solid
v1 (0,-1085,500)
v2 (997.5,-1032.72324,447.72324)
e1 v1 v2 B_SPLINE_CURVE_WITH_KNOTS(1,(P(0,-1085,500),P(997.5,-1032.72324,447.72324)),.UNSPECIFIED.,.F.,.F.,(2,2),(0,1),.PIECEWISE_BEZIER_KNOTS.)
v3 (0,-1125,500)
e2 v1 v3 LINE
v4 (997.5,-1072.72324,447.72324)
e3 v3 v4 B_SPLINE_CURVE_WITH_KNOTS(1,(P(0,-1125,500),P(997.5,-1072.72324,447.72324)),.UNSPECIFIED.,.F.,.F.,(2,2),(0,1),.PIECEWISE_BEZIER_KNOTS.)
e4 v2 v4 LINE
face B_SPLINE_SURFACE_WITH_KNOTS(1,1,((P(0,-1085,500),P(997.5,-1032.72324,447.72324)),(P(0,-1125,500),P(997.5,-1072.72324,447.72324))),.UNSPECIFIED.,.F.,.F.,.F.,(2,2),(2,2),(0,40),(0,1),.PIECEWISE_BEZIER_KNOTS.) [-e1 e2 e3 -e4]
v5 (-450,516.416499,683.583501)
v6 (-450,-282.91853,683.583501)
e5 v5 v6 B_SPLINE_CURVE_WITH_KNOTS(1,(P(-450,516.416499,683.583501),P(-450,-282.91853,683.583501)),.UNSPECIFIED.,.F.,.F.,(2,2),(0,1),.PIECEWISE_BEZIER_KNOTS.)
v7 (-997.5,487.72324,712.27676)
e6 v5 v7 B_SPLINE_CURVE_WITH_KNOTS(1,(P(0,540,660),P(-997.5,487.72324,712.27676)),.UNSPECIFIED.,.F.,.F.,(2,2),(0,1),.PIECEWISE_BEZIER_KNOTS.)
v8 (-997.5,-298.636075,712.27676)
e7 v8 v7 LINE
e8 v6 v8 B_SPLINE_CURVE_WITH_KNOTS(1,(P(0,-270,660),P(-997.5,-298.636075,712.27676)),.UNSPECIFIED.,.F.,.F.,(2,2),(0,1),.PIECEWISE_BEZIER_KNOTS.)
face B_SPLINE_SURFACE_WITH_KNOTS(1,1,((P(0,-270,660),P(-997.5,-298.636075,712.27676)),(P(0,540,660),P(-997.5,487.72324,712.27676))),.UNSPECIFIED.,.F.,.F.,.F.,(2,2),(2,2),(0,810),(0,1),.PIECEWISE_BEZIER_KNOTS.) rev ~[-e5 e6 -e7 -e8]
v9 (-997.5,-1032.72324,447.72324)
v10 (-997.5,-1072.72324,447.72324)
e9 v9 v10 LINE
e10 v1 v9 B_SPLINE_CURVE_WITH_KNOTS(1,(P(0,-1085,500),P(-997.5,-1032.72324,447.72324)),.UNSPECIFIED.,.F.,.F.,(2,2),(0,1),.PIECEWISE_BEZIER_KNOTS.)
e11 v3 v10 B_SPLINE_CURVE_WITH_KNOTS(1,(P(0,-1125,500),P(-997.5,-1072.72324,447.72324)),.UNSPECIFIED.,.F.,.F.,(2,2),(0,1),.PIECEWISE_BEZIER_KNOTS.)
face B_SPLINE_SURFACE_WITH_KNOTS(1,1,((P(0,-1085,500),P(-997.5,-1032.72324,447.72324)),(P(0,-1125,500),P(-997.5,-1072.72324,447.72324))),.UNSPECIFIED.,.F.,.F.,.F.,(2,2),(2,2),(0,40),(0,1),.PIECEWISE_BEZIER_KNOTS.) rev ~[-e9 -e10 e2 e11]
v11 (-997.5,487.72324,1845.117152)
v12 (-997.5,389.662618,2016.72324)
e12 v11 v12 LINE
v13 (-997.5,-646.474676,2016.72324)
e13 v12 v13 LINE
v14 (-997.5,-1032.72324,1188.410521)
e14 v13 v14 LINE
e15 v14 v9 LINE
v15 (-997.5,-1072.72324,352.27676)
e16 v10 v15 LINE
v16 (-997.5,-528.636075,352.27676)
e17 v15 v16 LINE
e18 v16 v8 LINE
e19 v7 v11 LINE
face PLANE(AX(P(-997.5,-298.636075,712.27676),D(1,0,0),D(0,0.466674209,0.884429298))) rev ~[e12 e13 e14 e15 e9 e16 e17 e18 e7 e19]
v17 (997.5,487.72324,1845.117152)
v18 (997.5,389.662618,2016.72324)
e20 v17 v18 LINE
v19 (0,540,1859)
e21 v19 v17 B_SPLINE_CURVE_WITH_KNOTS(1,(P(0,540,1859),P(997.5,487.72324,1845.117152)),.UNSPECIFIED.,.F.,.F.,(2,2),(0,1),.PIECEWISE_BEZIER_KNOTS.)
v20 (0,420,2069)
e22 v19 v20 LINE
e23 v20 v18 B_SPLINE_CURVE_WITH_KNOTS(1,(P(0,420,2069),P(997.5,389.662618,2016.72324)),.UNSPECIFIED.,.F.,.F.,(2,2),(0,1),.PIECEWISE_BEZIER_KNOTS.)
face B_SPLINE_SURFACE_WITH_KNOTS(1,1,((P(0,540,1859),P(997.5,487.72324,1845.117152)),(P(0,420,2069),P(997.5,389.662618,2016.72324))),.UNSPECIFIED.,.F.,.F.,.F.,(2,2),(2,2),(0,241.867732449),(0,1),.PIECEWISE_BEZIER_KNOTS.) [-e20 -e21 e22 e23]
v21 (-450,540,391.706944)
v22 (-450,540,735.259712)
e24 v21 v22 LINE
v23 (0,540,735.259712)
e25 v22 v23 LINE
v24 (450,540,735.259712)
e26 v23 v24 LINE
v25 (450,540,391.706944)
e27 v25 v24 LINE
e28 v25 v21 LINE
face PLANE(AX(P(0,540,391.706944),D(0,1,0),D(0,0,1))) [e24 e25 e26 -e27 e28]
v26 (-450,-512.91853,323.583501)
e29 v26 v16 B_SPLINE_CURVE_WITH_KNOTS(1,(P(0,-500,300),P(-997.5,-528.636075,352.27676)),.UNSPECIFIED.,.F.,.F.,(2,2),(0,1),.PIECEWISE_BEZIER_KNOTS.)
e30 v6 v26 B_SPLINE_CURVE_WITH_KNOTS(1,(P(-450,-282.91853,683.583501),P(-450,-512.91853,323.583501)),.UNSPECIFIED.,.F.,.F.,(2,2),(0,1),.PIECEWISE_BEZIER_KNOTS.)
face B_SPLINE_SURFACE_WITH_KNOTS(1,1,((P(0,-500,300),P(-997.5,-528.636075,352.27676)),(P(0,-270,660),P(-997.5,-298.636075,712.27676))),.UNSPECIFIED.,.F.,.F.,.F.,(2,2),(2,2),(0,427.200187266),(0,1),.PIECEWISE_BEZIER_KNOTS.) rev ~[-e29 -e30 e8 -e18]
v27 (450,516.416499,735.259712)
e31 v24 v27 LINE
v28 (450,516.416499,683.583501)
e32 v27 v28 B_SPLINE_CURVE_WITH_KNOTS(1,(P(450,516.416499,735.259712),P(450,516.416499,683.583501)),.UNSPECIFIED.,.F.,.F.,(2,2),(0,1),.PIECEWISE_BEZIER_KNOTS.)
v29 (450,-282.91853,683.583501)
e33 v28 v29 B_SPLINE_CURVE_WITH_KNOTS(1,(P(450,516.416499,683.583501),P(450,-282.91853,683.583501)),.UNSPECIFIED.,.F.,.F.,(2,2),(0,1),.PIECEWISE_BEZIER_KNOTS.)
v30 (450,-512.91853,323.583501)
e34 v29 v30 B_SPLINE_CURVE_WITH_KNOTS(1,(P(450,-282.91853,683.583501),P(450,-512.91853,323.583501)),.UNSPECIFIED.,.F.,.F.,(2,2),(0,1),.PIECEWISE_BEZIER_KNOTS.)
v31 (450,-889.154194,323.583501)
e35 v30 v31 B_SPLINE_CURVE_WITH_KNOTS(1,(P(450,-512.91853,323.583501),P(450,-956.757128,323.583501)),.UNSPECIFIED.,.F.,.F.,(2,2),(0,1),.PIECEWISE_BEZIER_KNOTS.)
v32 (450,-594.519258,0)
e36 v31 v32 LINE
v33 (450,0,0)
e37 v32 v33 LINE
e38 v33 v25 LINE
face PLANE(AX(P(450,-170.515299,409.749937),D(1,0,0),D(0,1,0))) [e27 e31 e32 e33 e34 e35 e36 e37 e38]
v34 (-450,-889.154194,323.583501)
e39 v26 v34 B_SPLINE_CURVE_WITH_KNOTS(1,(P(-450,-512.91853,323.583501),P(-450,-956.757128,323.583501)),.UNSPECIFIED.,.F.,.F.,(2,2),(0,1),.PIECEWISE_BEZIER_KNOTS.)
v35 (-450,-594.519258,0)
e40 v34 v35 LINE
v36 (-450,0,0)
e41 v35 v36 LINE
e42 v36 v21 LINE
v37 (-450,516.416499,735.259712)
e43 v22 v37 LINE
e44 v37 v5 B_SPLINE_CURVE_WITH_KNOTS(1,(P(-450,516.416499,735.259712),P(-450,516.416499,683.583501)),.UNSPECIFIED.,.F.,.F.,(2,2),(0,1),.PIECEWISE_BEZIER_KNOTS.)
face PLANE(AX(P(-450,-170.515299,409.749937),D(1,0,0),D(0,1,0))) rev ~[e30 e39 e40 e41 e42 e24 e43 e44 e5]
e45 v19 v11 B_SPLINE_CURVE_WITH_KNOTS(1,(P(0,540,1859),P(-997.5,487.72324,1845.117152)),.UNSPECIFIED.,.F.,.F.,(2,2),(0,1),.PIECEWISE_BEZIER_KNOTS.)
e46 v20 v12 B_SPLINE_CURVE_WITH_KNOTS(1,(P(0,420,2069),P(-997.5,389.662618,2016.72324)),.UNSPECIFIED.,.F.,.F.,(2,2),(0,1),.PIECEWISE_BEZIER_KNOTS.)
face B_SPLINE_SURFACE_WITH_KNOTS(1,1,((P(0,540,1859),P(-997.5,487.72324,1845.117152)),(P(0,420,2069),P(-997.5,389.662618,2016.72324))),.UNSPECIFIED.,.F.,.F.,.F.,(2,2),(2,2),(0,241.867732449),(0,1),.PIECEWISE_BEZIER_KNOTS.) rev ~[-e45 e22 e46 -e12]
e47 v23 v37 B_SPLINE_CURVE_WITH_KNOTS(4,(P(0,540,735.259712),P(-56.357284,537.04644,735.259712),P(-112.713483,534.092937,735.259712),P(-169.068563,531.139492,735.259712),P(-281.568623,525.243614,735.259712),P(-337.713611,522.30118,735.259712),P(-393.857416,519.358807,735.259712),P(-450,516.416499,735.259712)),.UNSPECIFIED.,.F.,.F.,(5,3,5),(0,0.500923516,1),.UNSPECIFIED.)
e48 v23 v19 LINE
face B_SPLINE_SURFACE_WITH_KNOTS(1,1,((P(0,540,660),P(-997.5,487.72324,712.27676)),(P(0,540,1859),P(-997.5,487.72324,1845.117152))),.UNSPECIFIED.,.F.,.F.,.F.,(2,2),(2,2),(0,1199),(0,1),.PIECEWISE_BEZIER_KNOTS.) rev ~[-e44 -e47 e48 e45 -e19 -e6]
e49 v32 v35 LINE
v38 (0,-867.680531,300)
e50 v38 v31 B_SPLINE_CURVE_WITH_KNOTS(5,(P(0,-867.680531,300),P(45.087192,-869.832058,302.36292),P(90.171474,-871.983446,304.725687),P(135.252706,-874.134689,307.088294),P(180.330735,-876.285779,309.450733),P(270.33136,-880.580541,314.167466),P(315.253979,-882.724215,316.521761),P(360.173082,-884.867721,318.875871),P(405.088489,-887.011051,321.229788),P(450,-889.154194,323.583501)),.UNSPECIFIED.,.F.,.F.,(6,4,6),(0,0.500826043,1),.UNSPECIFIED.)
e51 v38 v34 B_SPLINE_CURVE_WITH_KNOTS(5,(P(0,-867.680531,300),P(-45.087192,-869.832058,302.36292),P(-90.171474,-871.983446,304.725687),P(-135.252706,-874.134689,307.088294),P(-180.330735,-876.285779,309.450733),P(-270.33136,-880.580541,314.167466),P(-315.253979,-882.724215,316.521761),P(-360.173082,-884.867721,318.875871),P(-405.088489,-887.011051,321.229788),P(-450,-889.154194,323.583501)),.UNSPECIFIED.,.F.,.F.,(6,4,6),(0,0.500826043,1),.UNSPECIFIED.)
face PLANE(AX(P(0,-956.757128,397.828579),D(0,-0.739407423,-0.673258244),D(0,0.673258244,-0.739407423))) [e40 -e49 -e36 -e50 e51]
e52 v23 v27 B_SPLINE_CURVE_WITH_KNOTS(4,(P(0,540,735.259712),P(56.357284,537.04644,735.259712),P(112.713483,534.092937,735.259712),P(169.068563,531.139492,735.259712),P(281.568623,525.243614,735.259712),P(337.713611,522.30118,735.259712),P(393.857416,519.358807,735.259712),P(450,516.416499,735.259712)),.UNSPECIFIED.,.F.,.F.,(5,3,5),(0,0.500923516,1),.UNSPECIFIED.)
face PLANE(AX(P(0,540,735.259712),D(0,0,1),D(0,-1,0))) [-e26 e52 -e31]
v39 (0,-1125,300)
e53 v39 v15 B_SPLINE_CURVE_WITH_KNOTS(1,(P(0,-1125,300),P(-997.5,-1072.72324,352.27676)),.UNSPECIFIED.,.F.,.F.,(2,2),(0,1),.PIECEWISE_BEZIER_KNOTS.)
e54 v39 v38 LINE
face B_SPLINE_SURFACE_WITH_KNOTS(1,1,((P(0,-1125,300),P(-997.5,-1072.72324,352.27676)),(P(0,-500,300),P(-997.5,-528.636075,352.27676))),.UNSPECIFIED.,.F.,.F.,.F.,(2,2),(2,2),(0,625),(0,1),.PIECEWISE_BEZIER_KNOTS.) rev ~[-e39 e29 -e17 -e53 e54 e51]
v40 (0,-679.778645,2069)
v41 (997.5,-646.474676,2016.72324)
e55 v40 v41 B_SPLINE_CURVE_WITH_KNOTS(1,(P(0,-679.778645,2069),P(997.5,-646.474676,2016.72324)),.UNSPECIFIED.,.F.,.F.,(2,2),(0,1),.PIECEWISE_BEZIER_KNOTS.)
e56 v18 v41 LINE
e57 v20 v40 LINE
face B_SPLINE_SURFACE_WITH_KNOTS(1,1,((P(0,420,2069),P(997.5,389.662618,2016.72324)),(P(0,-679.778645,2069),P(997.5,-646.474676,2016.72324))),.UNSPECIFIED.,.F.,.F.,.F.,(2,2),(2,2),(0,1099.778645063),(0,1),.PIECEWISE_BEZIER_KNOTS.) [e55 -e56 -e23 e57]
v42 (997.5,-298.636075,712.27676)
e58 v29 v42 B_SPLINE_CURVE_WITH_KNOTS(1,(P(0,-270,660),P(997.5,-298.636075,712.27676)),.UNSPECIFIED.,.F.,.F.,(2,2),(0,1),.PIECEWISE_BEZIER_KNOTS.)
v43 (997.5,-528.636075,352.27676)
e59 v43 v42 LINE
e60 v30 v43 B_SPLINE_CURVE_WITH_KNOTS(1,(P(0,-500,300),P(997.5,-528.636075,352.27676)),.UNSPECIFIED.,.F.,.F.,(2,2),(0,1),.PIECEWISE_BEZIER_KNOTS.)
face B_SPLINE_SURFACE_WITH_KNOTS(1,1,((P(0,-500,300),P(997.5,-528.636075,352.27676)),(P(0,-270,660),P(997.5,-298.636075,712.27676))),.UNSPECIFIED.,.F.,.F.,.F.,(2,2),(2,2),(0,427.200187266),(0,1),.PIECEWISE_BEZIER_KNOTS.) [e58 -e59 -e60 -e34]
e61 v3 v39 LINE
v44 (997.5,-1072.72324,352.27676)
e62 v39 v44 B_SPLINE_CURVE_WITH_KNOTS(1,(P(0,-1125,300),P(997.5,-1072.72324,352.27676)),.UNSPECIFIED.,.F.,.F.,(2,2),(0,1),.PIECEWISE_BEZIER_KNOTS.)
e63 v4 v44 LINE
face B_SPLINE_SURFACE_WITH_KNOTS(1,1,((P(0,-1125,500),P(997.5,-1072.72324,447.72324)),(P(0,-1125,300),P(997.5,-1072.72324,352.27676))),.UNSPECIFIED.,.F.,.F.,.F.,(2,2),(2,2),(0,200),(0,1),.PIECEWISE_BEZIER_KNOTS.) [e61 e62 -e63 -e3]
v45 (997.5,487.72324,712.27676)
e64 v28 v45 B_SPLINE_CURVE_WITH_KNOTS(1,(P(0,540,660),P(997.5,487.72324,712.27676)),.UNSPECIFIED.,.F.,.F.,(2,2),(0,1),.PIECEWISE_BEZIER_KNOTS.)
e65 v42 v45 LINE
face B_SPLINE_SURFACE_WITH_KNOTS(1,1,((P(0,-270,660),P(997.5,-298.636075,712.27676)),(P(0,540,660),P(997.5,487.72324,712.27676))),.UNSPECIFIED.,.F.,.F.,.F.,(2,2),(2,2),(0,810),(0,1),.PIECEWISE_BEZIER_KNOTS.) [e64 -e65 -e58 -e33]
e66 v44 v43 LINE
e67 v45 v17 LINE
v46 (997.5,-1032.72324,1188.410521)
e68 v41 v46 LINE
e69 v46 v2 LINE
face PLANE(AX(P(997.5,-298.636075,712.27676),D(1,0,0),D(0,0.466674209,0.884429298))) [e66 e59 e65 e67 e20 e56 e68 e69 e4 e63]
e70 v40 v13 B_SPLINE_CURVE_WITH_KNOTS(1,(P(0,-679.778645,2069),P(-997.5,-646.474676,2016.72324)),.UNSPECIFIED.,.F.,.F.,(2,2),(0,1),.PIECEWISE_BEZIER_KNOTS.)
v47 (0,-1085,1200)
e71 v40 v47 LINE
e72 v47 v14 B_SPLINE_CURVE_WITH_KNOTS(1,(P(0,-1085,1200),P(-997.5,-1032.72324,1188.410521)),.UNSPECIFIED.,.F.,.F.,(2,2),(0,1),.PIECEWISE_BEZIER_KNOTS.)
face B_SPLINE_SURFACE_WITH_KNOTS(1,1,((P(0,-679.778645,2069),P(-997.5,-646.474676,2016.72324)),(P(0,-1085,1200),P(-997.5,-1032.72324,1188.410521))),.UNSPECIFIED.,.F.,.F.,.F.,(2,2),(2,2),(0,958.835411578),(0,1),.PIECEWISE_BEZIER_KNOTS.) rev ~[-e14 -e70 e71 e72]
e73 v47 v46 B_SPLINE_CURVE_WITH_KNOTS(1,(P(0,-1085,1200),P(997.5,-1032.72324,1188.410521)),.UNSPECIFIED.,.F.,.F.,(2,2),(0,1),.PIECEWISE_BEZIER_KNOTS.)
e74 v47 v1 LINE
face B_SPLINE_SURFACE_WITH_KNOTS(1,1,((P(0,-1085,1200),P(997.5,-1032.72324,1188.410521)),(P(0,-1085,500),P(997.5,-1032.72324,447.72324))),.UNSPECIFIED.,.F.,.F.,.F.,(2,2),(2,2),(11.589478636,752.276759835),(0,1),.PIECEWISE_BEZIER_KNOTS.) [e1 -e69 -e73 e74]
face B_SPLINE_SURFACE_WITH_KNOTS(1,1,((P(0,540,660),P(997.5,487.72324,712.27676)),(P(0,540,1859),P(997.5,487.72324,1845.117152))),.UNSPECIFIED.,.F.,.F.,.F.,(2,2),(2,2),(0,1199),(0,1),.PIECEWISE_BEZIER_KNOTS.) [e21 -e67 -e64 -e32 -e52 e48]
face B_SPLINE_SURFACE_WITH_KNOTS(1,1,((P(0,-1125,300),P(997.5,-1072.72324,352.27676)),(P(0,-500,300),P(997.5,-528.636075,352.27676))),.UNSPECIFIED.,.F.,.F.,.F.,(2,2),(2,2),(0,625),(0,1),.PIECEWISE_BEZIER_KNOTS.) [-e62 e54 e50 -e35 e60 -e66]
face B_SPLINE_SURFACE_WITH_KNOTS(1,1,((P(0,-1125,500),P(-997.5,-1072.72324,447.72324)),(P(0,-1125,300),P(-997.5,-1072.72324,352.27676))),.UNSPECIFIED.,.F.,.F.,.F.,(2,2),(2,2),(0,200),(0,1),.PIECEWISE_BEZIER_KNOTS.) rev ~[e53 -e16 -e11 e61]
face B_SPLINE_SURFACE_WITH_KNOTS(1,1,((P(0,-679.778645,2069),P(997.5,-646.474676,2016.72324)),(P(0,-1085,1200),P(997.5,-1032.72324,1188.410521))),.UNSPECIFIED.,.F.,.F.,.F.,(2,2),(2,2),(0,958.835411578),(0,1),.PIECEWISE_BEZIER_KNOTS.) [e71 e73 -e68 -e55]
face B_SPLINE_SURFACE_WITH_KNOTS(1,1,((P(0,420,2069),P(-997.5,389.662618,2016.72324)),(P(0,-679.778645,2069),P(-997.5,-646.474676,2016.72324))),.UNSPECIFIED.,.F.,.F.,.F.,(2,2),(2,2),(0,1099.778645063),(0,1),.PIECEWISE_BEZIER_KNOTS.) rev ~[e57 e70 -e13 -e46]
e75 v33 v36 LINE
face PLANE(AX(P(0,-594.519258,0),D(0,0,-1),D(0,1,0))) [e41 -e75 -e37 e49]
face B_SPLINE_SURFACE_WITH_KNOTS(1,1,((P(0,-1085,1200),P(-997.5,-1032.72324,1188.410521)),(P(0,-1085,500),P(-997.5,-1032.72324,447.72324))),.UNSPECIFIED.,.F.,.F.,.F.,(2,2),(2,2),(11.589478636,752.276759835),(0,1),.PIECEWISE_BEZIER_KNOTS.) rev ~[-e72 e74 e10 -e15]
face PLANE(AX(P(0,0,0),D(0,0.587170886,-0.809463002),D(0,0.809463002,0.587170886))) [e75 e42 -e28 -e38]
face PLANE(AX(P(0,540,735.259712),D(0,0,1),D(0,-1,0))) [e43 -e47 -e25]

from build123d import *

# Parameters (mm, degrees)
F1_DEPTH = 997.5
F1_TAPER = 3
F3_DEPTH = 450


# Not quite as in the source:
# - a feature of the source that left no trace in its solid (it failed there, or was rolled back) is left out


with BuildPart() as f1:
    # F0 (on Right) → F1 (new body, symmetric)
    with BuildSketch(Plane.YZ):
        Polygon((-270, 660), (540, 660), (540, 1859), (420, 2069), (-679.7786450633, 2069), (-1085, 1200), (-1085, 500), (-1125, 500), (-1125, 300), (-500, 300), align=None)
    extrude(amount=F1_DEPTH, both=True, taper=F1_TAPER)

    # F2 (on Right) → F3 (join, symmetric)
    with BuildSketch(Plane.YZ):
        Polygon((540, 391.706943512), (540, 660), (540, 735.2597117424), (-594.5192575455, 735.2597117424), (-956.7571282387, 397.828578949), (-594.5192575455, 0), (0, 0), align=None)
    extrude(amount=F3_DEPTH, both=True)


solid = f1.part
